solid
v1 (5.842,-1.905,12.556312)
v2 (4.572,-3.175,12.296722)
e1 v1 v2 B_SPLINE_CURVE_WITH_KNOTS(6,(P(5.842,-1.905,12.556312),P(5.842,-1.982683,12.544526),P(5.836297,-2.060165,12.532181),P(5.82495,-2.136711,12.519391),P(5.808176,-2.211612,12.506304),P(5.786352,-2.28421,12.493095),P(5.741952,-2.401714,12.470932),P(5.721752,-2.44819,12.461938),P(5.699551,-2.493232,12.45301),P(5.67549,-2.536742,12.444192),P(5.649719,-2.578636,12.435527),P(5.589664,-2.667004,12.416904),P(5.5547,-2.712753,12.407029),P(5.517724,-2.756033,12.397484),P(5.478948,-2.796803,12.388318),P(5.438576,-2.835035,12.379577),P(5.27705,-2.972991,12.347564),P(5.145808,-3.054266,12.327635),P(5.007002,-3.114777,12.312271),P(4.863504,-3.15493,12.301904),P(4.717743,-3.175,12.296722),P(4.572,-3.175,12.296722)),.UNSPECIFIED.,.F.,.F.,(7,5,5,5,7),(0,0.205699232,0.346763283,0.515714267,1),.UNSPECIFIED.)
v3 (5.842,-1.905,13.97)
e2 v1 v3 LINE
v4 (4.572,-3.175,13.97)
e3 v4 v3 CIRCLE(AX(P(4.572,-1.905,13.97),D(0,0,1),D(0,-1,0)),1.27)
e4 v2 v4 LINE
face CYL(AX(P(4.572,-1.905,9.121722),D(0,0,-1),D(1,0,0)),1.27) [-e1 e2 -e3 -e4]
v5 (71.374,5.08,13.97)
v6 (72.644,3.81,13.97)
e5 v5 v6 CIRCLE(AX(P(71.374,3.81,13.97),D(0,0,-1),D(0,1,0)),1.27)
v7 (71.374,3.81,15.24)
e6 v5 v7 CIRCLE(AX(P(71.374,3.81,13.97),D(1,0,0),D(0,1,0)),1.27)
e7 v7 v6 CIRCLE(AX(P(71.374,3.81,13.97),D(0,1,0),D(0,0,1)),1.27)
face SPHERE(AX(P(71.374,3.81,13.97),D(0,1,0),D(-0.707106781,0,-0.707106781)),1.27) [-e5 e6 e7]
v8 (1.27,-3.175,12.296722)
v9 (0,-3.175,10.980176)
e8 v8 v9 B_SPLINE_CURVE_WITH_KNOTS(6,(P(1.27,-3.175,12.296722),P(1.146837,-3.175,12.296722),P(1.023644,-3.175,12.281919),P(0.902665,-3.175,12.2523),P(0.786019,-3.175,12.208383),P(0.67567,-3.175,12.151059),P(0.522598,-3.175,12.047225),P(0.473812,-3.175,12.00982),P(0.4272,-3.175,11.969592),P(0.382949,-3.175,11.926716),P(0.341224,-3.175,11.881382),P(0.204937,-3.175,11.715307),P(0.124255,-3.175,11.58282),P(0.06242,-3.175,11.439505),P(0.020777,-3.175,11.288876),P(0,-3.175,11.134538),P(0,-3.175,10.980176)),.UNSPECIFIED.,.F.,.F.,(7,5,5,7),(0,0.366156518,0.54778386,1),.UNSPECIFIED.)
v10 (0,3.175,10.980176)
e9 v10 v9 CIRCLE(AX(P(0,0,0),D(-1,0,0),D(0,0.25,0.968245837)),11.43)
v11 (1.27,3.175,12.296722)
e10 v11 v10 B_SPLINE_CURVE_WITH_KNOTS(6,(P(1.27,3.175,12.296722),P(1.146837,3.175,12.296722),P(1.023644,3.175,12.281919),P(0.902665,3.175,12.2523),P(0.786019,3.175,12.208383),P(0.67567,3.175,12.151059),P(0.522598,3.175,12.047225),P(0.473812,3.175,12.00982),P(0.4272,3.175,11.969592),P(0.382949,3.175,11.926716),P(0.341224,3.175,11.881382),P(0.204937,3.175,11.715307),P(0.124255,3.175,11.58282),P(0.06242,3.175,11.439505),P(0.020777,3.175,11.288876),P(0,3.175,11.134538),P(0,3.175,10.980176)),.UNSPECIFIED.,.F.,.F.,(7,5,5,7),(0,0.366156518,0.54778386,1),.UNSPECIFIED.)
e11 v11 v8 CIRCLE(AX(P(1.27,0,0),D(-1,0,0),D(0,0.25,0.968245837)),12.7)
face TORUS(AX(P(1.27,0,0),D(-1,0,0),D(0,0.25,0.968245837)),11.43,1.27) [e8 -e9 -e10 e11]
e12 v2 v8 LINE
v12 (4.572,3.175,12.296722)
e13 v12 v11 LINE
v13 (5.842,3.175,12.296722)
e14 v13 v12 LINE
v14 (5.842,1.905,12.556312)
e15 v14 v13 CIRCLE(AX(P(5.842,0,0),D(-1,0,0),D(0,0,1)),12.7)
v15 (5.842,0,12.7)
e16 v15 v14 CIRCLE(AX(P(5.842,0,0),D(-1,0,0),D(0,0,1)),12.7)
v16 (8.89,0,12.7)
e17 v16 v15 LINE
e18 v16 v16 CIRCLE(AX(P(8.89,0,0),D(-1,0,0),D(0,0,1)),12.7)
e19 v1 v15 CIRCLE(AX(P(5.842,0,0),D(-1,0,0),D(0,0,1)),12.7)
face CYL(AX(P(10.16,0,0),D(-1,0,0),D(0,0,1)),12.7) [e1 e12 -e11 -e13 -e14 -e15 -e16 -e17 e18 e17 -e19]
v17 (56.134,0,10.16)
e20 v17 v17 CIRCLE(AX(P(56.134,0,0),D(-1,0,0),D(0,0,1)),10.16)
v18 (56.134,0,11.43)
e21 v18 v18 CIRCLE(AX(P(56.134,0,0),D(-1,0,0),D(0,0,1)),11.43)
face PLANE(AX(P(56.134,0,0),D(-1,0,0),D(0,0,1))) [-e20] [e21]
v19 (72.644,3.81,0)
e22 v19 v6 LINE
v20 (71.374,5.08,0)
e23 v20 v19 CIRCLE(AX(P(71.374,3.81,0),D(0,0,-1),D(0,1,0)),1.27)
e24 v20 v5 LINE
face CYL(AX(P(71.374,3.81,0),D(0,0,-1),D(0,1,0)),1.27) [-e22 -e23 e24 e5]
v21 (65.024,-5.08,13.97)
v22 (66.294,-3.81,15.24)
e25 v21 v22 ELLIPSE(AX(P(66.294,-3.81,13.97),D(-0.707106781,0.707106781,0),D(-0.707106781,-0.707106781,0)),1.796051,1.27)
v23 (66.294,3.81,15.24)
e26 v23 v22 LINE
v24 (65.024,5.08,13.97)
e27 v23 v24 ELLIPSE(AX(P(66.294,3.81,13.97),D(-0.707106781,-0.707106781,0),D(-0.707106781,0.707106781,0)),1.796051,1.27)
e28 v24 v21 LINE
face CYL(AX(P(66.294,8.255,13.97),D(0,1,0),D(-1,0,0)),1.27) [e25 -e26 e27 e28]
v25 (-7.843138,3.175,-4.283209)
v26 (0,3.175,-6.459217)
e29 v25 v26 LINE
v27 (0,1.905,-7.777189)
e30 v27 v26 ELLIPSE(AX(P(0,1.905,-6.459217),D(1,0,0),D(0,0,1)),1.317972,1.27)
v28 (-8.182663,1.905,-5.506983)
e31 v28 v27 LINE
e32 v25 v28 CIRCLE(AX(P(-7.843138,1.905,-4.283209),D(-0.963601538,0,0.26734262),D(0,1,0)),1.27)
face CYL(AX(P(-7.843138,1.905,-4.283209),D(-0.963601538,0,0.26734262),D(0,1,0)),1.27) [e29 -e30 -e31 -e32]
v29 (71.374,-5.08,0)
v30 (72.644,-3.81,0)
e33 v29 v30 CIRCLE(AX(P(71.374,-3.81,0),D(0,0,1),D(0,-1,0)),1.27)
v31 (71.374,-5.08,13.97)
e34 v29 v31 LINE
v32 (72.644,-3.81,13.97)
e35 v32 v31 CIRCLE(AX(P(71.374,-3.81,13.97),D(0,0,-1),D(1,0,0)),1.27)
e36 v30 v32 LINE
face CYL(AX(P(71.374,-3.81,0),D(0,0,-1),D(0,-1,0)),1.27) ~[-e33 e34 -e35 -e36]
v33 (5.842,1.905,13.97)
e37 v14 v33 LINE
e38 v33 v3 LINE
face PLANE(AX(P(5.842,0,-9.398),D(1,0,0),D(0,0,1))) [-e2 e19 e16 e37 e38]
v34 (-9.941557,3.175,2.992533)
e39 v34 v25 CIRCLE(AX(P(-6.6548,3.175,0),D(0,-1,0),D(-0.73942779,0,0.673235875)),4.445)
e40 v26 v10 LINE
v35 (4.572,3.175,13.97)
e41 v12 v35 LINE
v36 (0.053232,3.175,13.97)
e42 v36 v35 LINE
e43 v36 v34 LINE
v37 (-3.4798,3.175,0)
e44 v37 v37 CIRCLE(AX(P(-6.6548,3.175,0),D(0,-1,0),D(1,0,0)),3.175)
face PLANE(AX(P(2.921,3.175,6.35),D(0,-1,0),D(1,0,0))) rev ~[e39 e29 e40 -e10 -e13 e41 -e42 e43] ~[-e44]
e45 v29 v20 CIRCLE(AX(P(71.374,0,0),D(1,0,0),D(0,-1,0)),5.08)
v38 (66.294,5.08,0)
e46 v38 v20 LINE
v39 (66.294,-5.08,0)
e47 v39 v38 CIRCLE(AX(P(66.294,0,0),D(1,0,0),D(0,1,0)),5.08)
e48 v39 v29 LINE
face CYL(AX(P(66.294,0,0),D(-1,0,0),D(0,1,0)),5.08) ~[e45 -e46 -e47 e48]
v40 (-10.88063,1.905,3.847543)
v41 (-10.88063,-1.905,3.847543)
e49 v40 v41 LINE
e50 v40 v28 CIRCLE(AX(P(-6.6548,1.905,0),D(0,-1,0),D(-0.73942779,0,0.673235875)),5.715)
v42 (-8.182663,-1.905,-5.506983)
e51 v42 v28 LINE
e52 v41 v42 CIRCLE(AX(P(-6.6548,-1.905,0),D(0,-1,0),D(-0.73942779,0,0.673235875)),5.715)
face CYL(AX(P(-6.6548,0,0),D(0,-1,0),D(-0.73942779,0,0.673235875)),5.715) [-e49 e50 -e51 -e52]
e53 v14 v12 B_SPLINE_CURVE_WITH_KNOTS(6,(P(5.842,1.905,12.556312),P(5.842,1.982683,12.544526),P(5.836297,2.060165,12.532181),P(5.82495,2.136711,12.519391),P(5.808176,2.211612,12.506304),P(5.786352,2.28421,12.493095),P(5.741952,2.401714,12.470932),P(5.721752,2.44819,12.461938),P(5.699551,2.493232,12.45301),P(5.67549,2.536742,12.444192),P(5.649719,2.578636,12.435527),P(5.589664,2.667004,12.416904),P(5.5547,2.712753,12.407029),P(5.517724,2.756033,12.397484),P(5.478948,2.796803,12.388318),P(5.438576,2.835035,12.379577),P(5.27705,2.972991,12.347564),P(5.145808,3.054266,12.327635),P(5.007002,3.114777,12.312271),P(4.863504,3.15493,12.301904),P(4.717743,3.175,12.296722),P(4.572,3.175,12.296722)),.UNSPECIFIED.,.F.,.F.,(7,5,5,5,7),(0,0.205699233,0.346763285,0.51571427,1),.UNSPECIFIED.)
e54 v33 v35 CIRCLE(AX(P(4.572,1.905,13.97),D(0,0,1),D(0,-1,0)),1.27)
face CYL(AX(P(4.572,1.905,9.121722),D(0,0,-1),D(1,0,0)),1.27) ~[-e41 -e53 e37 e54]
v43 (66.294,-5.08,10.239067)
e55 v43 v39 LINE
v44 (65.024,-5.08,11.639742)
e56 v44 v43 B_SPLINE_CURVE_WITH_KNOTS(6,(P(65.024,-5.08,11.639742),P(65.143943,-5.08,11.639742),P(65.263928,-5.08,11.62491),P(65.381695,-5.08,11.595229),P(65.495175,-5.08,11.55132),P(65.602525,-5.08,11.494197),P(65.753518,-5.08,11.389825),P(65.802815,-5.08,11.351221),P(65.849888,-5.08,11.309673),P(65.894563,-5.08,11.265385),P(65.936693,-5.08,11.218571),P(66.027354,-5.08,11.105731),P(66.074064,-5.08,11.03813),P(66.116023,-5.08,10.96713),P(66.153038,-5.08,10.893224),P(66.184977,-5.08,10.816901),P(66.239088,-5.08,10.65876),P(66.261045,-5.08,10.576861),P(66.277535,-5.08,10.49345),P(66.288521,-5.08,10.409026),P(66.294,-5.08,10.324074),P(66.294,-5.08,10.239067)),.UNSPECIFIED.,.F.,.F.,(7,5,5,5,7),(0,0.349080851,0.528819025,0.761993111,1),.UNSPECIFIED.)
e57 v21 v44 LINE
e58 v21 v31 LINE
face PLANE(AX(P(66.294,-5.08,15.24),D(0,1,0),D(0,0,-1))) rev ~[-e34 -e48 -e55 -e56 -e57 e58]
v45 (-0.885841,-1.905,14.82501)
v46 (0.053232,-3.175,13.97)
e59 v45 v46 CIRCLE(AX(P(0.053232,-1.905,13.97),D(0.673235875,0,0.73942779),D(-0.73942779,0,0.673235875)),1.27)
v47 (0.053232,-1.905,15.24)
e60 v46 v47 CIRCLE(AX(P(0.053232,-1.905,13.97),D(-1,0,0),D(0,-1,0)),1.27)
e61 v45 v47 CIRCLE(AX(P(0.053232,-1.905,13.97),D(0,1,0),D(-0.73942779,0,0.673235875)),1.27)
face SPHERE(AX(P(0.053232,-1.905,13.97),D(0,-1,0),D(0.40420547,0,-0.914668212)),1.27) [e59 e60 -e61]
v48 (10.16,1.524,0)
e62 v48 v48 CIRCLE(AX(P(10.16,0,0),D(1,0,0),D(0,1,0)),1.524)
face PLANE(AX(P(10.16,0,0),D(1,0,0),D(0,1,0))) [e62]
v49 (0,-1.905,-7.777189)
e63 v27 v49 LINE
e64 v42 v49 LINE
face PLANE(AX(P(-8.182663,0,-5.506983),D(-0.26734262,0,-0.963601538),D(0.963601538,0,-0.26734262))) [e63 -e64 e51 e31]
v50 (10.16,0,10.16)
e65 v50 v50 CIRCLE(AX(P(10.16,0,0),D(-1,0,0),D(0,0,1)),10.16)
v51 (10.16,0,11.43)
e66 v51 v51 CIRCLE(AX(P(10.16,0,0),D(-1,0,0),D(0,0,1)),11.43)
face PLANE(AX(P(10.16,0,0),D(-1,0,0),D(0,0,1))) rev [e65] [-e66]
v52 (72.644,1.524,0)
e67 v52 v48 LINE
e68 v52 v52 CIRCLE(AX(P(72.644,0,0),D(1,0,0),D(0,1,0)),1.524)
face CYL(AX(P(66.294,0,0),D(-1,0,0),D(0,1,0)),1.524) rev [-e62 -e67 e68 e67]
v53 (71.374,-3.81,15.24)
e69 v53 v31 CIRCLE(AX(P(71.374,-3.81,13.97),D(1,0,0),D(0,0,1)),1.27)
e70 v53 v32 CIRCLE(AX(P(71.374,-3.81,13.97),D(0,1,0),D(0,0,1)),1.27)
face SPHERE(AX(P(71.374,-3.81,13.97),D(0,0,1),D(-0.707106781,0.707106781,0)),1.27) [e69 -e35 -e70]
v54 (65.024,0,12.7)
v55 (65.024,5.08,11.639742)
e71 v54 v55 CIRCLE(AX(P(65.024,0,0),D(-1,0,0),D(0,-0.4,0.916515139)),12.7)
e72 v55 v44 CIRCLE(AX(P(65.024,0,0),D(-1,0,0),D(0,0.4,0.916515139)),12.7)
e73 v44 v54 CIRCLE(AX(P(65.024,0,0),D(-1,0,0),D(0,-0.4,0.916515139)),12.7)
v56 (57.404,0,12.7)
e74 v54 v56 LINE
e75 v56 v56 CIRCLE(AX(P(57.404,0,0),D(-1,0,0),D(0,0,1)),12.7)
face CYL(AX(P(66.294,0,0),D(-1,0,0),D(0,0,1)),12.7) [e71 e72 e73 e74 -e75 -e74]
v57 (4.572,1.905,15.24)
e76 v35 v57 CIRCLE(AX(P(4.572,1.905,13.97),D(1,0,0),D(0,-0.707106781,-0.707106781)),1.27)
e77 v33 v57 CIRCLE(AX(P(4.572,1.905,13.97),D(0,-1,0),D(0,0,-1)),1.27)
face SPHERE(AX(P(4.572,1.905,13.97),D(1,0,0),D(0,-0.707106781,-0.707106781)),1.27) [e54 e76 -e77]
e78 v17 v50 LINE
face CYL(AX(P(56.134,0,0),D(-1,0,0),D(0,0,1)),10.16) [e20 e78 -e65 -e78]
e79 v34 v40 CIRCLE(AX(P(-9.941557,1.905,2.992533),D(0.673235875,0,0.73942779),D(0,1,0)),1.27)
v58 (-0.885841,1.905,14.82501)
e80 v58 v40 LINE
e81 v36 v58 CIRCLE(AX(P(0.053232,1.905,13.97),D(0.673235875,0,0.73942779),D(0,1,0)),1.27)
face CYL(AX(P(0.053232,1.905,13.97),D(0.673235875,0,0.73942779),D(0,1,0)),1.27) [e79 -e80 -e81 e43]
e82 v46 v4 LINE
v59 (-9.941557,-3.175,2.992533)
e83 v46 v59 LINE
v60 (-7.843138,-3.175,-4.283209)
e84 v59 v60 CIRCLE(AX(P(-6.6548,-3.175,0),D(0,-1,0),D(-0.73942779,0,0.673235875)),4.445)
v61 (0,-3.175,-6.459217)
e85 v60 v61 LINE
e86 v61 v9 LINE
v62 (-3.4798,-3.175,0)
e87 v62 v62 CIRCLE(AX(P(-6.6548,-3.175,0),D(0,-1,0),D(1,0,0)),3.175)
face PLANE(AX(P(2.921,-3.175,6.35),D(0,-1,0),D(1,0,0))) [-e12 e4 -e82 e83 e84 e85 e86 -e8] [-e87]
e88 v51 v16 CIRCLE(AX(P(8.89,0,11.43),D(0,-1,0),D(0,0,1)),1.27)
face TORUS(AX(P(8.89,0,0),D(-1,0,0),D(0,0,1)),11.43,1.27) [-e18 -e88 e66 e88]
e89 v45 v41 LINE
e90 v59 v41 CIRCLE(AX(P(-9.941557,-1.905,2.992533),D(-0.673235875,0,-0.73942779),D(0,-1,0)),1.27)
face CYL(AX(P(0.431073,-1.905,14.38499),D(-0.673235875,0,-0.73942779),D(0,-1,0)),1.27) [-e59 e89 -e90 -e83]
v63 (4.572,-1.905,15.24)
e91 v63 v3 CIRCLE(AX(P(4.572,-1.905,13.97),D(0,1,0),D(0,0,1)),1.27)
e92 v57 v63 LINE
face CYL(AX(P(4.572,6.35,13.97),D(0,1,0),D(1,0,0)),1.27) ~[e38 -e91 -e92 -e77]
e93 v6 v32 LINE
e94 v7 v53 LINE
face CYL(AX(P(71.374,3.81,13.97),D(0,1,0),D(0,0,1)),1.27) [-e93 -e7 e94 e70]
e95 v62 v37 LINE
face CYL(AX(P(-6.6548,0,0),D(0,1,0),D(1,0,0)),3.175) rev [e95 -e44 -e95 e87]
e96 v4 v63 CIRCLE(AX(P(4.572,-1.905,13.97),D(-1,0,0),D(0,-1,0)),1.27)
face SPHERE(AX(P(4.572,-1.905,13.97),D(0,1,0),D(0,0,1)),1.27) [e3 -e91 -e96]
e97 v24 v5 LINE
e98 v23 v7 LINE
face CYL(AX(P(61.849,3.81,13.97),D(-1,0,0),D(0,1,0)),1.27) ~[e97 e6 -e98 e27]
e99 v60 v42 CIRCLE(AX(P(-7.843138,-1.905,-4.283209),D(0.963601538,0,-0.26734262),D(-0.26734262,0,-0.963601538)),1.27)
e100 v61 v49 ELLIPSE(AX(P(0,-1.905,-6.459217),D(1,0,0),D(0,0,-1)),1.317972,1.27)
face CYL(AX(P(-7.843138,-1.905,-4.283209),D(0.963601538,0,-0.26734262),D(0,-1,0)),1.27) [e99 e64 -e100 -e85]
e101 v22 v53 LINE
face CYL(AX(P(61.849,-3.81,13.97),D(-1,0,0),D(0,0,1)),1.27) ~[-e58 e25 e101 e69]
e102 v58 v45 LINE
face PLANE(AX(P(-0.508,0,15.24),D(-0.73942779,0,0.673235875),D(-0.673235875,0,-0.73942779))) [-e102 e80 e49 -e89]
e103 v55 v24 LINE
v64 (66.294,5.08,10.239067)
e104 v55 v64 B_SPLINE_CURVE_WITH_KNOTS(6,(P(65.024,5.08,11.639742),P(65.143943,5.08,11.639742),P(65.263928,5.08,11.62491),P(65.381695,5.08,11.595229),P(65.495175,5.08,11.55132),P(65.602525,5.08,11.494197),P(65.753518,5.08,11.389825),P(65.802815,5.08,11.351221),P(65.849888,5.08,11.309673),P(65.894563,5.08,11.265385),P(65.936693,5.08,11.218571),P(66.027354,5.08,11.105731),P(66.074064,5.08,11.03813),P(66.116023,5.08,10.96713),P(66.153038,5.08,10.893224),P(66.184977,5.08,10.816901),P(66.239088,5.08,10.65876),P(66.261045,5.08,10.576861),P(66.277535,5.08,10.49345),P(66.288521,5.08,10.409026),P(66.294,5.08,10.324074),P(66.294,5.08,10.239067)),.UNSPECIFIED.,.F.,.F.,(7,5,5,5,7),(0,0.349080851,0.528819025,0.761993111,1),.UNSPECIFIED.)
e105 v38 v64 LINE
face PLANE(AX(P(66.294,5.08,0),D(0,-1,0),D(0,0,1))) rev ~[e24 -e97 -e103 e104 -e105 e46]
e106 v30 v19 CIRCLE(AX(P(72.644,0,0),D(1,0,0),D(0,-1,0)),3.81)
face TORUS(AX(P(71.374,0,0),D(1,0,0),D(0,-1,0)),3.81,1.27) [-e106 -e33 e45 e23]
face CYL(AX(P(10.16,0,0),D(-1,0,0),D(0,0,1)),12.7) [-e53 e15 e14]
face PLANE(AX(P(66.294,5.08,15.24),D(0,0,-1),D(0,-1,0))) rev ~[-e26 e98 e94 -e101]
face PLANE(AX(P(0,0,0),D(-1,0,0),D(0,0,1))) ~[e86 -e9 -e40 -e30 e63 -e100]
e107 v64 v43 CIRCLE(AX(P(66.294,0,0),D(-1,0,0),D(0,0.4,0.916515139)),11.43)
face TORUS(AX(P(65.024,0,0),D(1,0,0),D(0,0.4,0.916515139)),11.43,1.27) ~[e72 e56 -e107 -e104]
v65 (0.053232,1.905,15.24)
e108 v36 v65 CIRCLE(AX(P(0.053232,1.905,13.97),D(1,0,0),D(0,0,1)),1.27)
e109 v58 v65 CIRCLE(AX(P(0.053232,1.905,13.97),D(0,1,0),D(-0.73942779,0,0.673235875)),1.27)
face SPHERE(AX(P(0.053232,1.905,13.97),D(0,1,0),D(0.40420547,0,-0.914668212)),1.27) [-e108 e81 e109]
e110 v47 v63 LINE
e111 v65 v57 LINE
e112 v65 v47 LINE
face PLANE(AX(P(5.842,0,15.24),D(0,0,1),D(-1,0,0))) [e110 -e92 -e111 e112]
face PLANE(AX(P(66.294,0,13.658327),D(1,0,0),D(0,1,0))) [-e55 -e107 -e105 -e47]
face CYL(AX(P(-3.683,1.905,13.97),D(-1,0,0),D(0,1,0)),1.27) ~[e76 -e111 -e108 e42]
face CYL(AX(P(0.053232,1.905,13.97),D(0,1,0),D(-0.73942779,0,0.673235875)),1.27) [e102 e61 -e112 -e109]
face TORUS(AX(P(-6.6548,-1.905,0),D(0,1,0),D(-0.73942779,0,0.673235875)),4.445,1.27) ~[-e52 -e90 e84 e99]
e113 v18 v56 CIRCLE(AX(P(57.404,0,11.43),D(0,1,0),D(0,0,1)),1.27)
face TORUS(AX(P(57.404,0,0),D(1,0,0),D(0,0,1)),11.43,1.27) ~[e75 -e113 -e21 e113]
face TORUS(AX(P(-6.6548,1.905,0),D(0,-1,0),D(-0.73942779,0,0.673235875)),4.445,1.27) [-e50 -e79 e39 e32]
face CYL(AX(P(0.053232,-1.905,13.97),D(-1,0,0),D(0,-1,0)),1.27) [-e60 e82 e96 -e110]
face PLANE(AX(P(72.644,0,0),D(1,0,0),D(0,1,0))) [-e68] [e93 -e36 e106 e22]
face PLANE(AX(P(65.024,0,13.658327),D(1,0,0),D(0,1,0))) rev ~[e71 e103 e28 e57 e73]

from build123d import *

# Parameters (mm, degrees)
F0_W          = 5.842
F0_H          = 12.7
F0_R          = 3.175
F1_DEPTH      = 3.175
F3_R          = 1.524
F4_DEPTH      = 56.134
F5_DEPTH      = 1.27
F6_DEPTH      = 6.35
F7_R          = 1.27
F8_R          = 1.27
F9_T1_DEPTH   = 12.7
F9_T3_DEPTH   = 12.7
F10_T1_DEPTH  = 4.5187681337
F10_T3_DEPTH  = 3.81
F10_T5_DEPTH  = 14.8458939279
F10_T10_DEPTH = 1.27
F10_T16_DEPTH = 1.27
F10_T20_ANGLE = 89.9999999979
F10_T22_ANGLE = 116.8111069241
F10_T26_DEPTH = 11.6667497034
F10_T31_DEPTH = 4.8482778758
F10_S32_R     = 12.7
F10_T33_DEPTH = 4
F11_T1_DEPTH  = 7.62
F11_T3_DEPTH  = 9.525
F11_T5_DEPTH  = 16.51
F11_T7_DEPTH  = 13.97
F11_S11_W     = 1.27
F11_S11_H     = 1.27
F11_T12_DEPTH = 1.27
F11_S17_W     = 1.27
F11_S17_H     = 1.27
F11_T18_DEPTH = 1.27
F11_S23_W     = 1.27
F11_S23_H     = 1.27
F11_T24_DEPTH = 1.27
F11_T30_DEPTH = 4.8482778758
F11_S31_R     = 12.7
F11_T32_DEPTH = 4
F11_T34_ANGLE = 180


# Not quite as in the source:
# - a fillet or chamfer that OpenCascade refuses, or shapes differently, is made with other operations: its cross-section is extruded or revolved along the edge and cut away or added


with BuildPart() as f1:
    # F0 (on Front) → F1 (new body, symmetric)
    with BuildSketch(Plane.XZ):
        with Locations((2.921, 6.35)):
            Rectangle(F0_W, F0_H)
        with BuildLine():
            Line((-0.9398, 0), (0, 0))
            Line((0, 0), (0, 12.7))
            Line((0, 12.7), (5.842, 12.7))
            Line((5.842, 12.7), (5.842, 15.24))
            Line((5.842, 15.24), (-0.508, 15.24))
            Line((-0.508, 15.24), (-10.8806298187, 3.8475430269))
            ThreePointArc((-10.8806298187, 3.8475430269), (-4.5919612295, 5.3297205562), (-0.9398, 0))
        make_face()
        with BuildLine():
            Line((5.842, 0), (0, 0))
            Line((0, 0), (-0.9398, 0))
            ThreePointArc((-0.9398, 0), (-3.1957909266, -4.5493385486), (-8.1826630726, -5.5069827884))
            Line((-8.1826630726, -5.5069827884), (5.842, -9.398))
            Line((5.842, -9.398), (5.842, 0))
        make_face()
        with BuildLine():
            ThreePointArc((-8.1826630726, -5.5069827884), (-3.1957909266, -4.5493385486), (-0.9398, 0))
            ThreePointArc((-0.9398, 0), (-4.5919612295, 5.3297205562), (-10.8806298187, 3.8475430269))
            ThreePointArc((-10.8806298187, 3.8475430269), (-12.1459778134, -1.5837270034), (-8.1826630726, -5.5069827884))
        make_face()
        with Locations((-6.6548, 0)):
            Circle(F0_R, mode=Mode.SUBTRACT)
    extrude(amount=F1_DEPTH, both=True)

    # F0 (on Front) → F2 (revolve)
    with BuildSketch(Plane.XZ):
        Polygon((5.842, 12.7), (5.842, 0), (66.294, 0), (66.294, 12.7), (56.134, 12.7), (56.134, 10.16), (10.16, 10.16), (10.16, 12.7), align=None)
        with Locations((2.921, 6.35)):
            Rectangle(F0_W, F0_H)
    revolve(axis=Axis((33.147, 0, 0), (-1, 0, 0)))

    # F3 (on face) → F4 (cut, through all)
    with BuildSketch(Plane.YZ.offset(66.294)):
        Circle(F3_R)
    extrude(amount=-F4_DEPTH, mode=Mode.SUBTRACT)

    # F3 (on face) → F5 (join)
    with BuildSketch(Plane.YZ.offset(66.294)):
        with BuildLine():
            ThreePointArc((-5.08, 11.6397422652), (0, 12.7), (5.08, 11.6397422652))
            Line((5.08, 11.6397422652), (5.08, 15.24))
            Line((5.08, 15.24), (-5.08, 15.24))
            Line((-5.08, 15.24), (-5.08, 11.6397422652))
        make_face()
    extrude(amount=-F5_DEPTH)

    # F3 (on face) → F6 (join)
    with BuildSketch(Plane.YZ.offset(66.294)):
        with BuildLine():
            ThreePointArc((-5.08, 0), (0, -5.08), (5.08, 0))
            ThreePointArc((5.08, 0), (0, 5.08), (-5.08, 0))
        make_face()
        Circle(F3_R, mode=Mode.SUBTRACT)
        with BuildLine():
            ThreePointArc((-5.08, 0), (0, 5.08), (5.08, 0))
            Line((5.08, 0), (5.08, 15.24))
            Line((5.08, 15.24), (-5.08, 15.24))
            Line((-5.08, 15.24), (-5.08, 0))
        make_face()
    extrude(amount=F6_DEPTH)

    # F7
    f7_edges = [f1.edges().sort_by_distance(p)[0] for p in [
        (0, 0, -12.7),
        (10.16, 0, -12.7),
        (-4.091332, -3.175, -6.642086),
    ]]
    fillet(f7_edges, radius=F7_R)

    # F8
    f8_edges = [f1.edges().sort_by_distance(p)[0] for p in [
        (56.134, 0, -12.7),
        (66.294, 0, -12.7),
    ]]
    fillet(f8_edges, radius=F8_R)

    # F9: fillet of radius 1.27 on 2 edges, made by hand

    # F9_s2 → F9_t1 (cut)
    with BuildSketch(Plane.XZ.offset(-6.35)):
        with BuildLine():
            ThreePointArc((5.842, 13.97), (5.4700256121, 14.8680256121), (4.572, 15.24))
            Line((4.572, 15.24), (5.842, 15.24))
            Line((5.842, 15.24), (5.842, 13.97))
        make_face()
    extrude(amount=F9_T1_DEPTH, mode=Mode.SUBTRACT)

    # F9_s4 → F9_t3 (cut)
    with BuildSketch(Plane.YZ.offset(-3.683)):
        with BuildLine():
            ThreePointArc((3.175, 13.97), (2.8030256121, 14.8680256121), (1.905, 15.24))
            Line((1.905, 15.24), (3.175, 15.24))
            Line((3.175, 15.24), (3.175, 13.97))
        make_face()
    extrude(amount=F9_T3_DEPTH, mode=Mode.SUBTRACT)

    # F10: fillet of radius 1.27 on 1 edges, made by hand

    # F10_s2 → F10_t1 (cut)
    with BuildSketch(Plane.YZ.offset(0.0532318663)):
        with BuildLine():
            ThreePointArc((-3.175, 13.97), (-2.8030256121, 14.8680256121), (-1.905, 15.24))
            Line((-1.905, 15.24), (-3.175, 15.24))
            Line((-3.175, 15.24), (-3.175, 13.97))
        make_face()
    extrude(amount=F10_T1_DEPTH, mode=Mode.SUBTRACT)

    # F10_s4 → F10_t3 (cut)
    with BuildSketch(Plane.XZ.offset(-1.905)):
        with BuildLine():
            ThreePointArc((-0.8858414267, 14.8250095615), (-0.4601090812, 15.1316286289), (0.0532318663, 15.24))
            Line((0.0532318663, 15.24), (-0.508, 15.24))
            Line((-0.508, 15.24), (-0.8858414267, 14.8250095615))
        make_face()
    extrude(amount=F10_T3_DEPTH, mode=Mode.SUBTRACT)

    # F10_s6 → F10_t5 (cut)
    with BuildSketch(Plane(origin=(6.9785232931, 0, 7.6646451037), x_dir=(0, 1, 0), z_dir=(-0.6732358752, 0, -0.7394277898))):
        with BuildLine():
            ThreePointArc((3.175, -9.3657440555), (2.8030256121, -10.2637696676), (1.905, -10.6357440555))
            Line((1.905, -10.6357440555), (3.175, -10.6357440555))
            Line((3.175, -10.6357440555), (3.175, -9.3657440555))
        make_face()
    extrude(amount=F10_T5_DEPTH, mode=Mode.SUBTRACT)


with BuildPart() as f10_tool8:
    # F10_s9 → F10_t10 (new body)
    with BuildSketch(Plane.XZ.offset(1.905)):
        Polygon((0.0532318663, 13.97), (0.0532318663, 15.24), (-0.508, 15.24), (-0.8858414267, 14.8250095615), align=None)
    extrude(amount=F10_T10_DEPTH)

    # F10_s11 → F10_t12 (revolve, cut)
    with BuildSketch(Plane(origin=(0.0532318663, -1.905, 13.97), x_dir=(0.4042054705, 0, -0.9146682118), z_dir=(-0.9146682118, 0, -0.4042054705))):
        with BuildLine():
            ThreePointArc((0, -1.27), (1.27, 0), (0, 1.27))
            Line((0, 1.27), (0, -1.27))
        make_face()
    revolve(axis=Axis((0.0532318663, -1.905, 13.97), (0, -1, 0)), mode=Mode.SUBTRACT)


with BuildPart() as f1_1:
    add(f1.part)

    # F10_t7: cut F10_tool8
    add(f10_tool8.part, mode=Mode.SUBTRACT)


with BuildPart() as f10_tool14:
    # F10_s15 → F10_t16 (new body)
    with BuildSketch(Plane.XZ.offset(-1.905)):
        Polygon((0.0532318663, 13.97), (0.0532318663, 15.24), (-0.508, 15.24), (-0.8858414267, 14.8250095615), align=None)
    extrude(amount=-F10_T16_DEPTH)

    # F10_s17 → F10_t18 (revolve, cut)
    with BuildSketch(Plane(origin=(0.0532318663, 1.905, 13.97), x_dir=(0.4042054705, 0, -0.9146682118), z_dir=(0.9146682118, 0, 0.4042054705))):
        with BuildLine():
            ThreePointArc((0, -1.27), (1.27, 0), (0, 1.27))
            Line((0, 1.27), (0, -1.27))
        make_face()
    revolve(axis=Axis((0.0532318663, 1.905, 13.97), (0, 1, 0)), mode=Mode.SUBTRACT)


with BuildPart() as f1_2:
    add(f1_1.part)

    # F10_t13: cut F10_tool14
    add(f10_tool14.part, mode=Mode.SUBTRACT)

    # F10_s19 → F10_t20 (revolve, cut)
    with BuildSketch(Plane.YZ.offset(4.572)):
        with BuildLine():
            ThreePointArc((-3.175, 13.97), (-2.8030256121, 14.8680256121), (-1.905, 15.24))
            Line((-1.905, 15.24), (-3.175, 15.24))
            Line((-3.175, 15.24), (-3.175, 13.97))
        make_face()
    revolve(axis=Axis((4.572, -3.175, 13.97), (0, 1, 0)), revolution_arc=F10_T20_ANGLE, mode=Mode.SUBTRACT)

    # F10_s21 → F10_t22 (revolve, cut)
    with BuildSketch(Plane(origin=(-3.0162650989, 0, -3.3128214309), x_dir=(0, 1, 0), z_dir=(0.6732358752, 0, 0.7394277898))):
        with BuildLine():
            ThreePointArc((3.175, 9.3657440555), (2.8030256121, 10.2637696676), (1.905, 10.6357440555))
            Line((1.905, 10.6357440555), (3.175, 10.6357440555))
            Line((3.175, 10.6357440555), (3.175, 9.3657440555))
        make_face()
    revolve(axis=Axis((-6.6548, 3.175, 0), (0, -1, 0)), revolution_arc=F10_T22_ANGLE, mode=Mode.SUBTRACT)


with BuildPart() as f10_tool24:
    # F10_s25 → F10_t26 (new body)
    with BuildSketch(Plane(origin=(-6.179167626, 0, 1.7143547379), x_dir=(0, 1, 0), z_dir=(0.9636015378, 0, -0.2673426199))):
        with BuildLine():
            ThreePointArc((3.175, -6.2241116667), (2.8030256121, -7.1221372788), (1.905, -7.4941116667))
            Line((1.905, -7.4941116667), (3.175, -7.4941116667))
            Line((3.175, -7.4941116667), (3.175, -6.2241116667))
        make_face()
    extrude(amount=F10_T26_DEPTH)

    split(bisect_by=Plane.YZ, keep=Keep.BOTTOM)


with BuildPart() as f1_3:
    add(f1_2.part)

    # F10_t23: cut F10_tool24
    add(f10_tool24.part, mode=Mode.SUBTRACT)


with BuildPart() as f10_tool29:
    # F10_s30 → F10_t31 (new body)
    with BuildSketch(Plane.XY.offset(9.1217221242)):
        with BuildLine():
            ThreePointArc((5.842, -1.905), (5.4700256121, -2.8030256121), (4.572, -3.175))
            Line((4.572, -3.175), (5.842, -3.175))
            Line((5.842, -3.175), (5.842, -1.905))
        make_face()
    extrude(amount=F10_T31_DEPTH)

    # F10_s32 → F10_t33 (cut, symmetric)
    with BuildSketch(Plane.YZ.offset(5.2)):
        Circle(F10_S32_R)
    extrude(amount=F10_T33_DEPTH, both=True, mode=Mode.SUBTRACT)


with BuildPart() as f1_4:
    add(f1_3.part)

    # F10_t28: cut F10_tool29
    add(f10_tool29.part, mode=Mode.SUBTRACT)

    # F11: fillet of radius 1.27 on 8 edges, made by hand

    # F11_s2 → F11_t1 (cut)
    with BuildSketch(Plane.XZ.offset(-3.81)):
        with BuildLine():
            ThreePointArc((71.374, 15.24), (72.2720256121, 14.8680256121), (72.644, 13.97))
            Line((72.644, 13.97), (72.644, 15.24))
            Line((72.644, 15.24), (71.374, 15.24))
        make_face()
    extrude(amount=F11_T1_DEPTH, mode=Mode.SUBTRACT)

    # F11_s4 → F11_t3 (cut)
    with BuildSketch(Plane.YZ.offset(61.849)):
        with BuildLine():
            ThreePointArc((-3.81, 15.24), (-4.7080256121, 14.8680256121), (-5.08, 13.97))
            Line((-5.08, 13.97), (-5.08, 15.24))
            Line((-5.08, 15.24), (-3.81, 15.24))
        make_face()
        with BuildLine():
            ThreePointArc((5.08, 13.97), (4.7080256121, 14.8680256121), (3.81, 15.24))
            Line((3.81, 15.24), (5.08, 15.24))
            Line((5.08, 15.24), (5.08, 13.97))
        make_face()
    extrude(amount=F11_T3_DEPTH, mode=Mode.SUBTRACT)

    # F11_s6 → F11_t5 (cut)
    with BuildSketch(Plane.XZ.offset(-8.255)):
        with BuildLine():
            ThreePointArc((65.024, 13.97), (65.3959743879, 14.8680256121), (66.294, 15.24))
            Line((66.294, 15.24), (65.024, 15.24))
            Line((65.024, 15.24), (65.024, 13.97))
        make_face()
    extrude(amount=F11_T5_DEPTH, mode=Mode.SUBTRACT)

    # F11_s8 → F11_t7 (cut)
    with BuildSketch(Plane.XY):
        with BuildLine():
            ThreePointArc((71.374, -5.08), (72.2720256121, -4.7080256121), (72.644, -3.81))
            Line((72.644, -3.81), (72.644, -5.08))
            Line((72.644, -5.08), (71.374, -5.08))
        make_face()
        with BuildLine():
            ThreePointArc((71.374, 5.08), (72.2720256121, 4.7080256121), (72.644, 3.81))
            Line((72.644, 3.81), (72.644, 5.08))
            Line((72.644, 5.08), (71.374, 5.08))
        make_face()
    extrude(amount=F11_T7_DEPTH, mode=Mode.SUBTRACT)


with BuildPart() as f11_tool10:
    # F11_s11 → F11_t12 (new body)
    with BuildSketch(Plane.YZ.offset(4.572)):
        with Locations((2.54, 14.605)):
            Rectangle(F11_S11_W, F11_S11_H)
    extrude(amount=F11_T12_DEPTH)

    # F11_s13 → F11_t14 (revolve, cut)
    with BuildSketch(Plane(origin=(4.572, 1.905, 13.97), x_dir=(0, -0.7071067812, -0.7071067812), z_dir=(0, -0.7071067812, 0.7071067812))):
        with BuildLine():
            ThreePointArc((0, -1.27), (1.27, 0), (0, 1.27))
            Line((0, 1.27), (0, -1.27))
        make_face()
    revolve(axis=Axis((4.572, 1.905, 13.97), (1, 0, 0)), mode=Mode.SUBTRACT)


with BuildPart() as f1_5:
    add(f1_4.part)

    # F11_t9: cut F11_tool10
    add(f11_tool10.part, mode=Mode.SUBTRACT)


with BuildPart() as f11_tool16:
    # F11_s17 → F11_t18 (new body)
    with BuildSketch(Plane.XZ.offset(-3.81)):
        with Locations((72.009, 14.605)):
            Rectangle(F11_S17_W, F11_S17_H)
    extrude(amount=-F11_T18_DEPTH)

    # F11_s19 → F11_t20 (revolve, cut)
    with BuildSketch(Plane(origin=(71.374, 3.81, 13.97), x_dir=(-0.7071067812, 0, -0.7071067812), z_dir=(0.7071067812, 0, -0.7071067812))):
        with BuildLine():
            ThreePointArc((0, -1.27), (1.27, 0), (0, 1.27))
            Line((0, 1.27), (0, -1.27))
        make_face()
    revolve(axis=Axis((71.374, 3.81, 13.97), (0, 1, 0)), mode=Mode.SUBTRACT)


with BuildPart() as f1_6:
    add(f1_5.part)

    # F11_t15: cut F11_tool16
    add(f11_tool16.part, mode=Mode.SUBTRACT)


with BuildPart() as f11_tool22:
    # F11_s23 → F11_t24 (new body)
    with BuildSketch(Plane.XY.offset(13.97)):
        with Locations((72.009, -4.445)):
            Rectangle(F11_S23_W, F11_S23_H)
    extrude(amount=F11_T24_DEPTH)

    # F11_s25 → F11_t26 (revolve, cut)
    with BuildSketch(Plane(origin=(71.374, -3.81, 13.97), x_dir=(-0.7071067812, 0.7071067812, 0), z_dir=(0.7071067812, 0.7071067812, 0))):
        with BuildLine():
            ThreePointArc((0, -1.27), (1.27, 0), (0, 1.27))
            Line((0, 1.27), (0, -1.27))
        make_face()
    revolve(axis=Axis((71.374, -3.81, 13.97), (0, 0, 1)), mode=Mode.SUBTRACT)


with BuildPart() as f1_7:
    add(f1_6.part)

    # F11_t21: cut F11_tool22
    add(f11_tool22.part, mode=Mode.SUBTRACT)


with BuildPart() as f11_tool28:
    # F11_s29 → F11_t30 (new body)
    with BuildSketch(Plane.XY.offset(9.1217221242)):
        with BuildLine():
            ThreePointArc((5.842, 1.905), (5.4700256121, 2.8030256121), (4.572, 3.175))
            Line((4.572, 3.175), (5.842, 3.175))
            Line((5.842, 3.175), (5.842, 1.905))
        make_face()
    extrude(amount=F11_T30_DEPTH)

    # F11_s31 → F11_t32 (cut, symmetric)
    with BuildSketch(Plane.YZ.offset(5.2)):
        Circle(F11_S31_R)
    extrude(amount=F11_T32_DEPTH, both=True, mode=Mode.SUBTRACT)


with BuildPart() as f1_8:
    add(f1_7.part)

    # F11_t27: cut F11_tool28
    add(f11_tool28.part, mode=Mode.SUBTRACT)

    # F11_s33 → F11_t34 (revolve, cut)
    with BuildSketch(Plane.XY):
        with BuildLine():
            ThreePointArc((71.374, -5.08), (72.2720256121, -4.7080256121), (72.644, -3.81))
            Line((72.644, -3.81), (72.644, -5.08))
            Line((72.644, -5.08), (71.374, -5.08))
        make_face()
    revolve(axis=Axis((72.644, 0, 0), (1, 0, 0)), revolution_arc=F11_T34_ANGLE, mode=Mode.SUBTRACT)


solid = f1_8.part
